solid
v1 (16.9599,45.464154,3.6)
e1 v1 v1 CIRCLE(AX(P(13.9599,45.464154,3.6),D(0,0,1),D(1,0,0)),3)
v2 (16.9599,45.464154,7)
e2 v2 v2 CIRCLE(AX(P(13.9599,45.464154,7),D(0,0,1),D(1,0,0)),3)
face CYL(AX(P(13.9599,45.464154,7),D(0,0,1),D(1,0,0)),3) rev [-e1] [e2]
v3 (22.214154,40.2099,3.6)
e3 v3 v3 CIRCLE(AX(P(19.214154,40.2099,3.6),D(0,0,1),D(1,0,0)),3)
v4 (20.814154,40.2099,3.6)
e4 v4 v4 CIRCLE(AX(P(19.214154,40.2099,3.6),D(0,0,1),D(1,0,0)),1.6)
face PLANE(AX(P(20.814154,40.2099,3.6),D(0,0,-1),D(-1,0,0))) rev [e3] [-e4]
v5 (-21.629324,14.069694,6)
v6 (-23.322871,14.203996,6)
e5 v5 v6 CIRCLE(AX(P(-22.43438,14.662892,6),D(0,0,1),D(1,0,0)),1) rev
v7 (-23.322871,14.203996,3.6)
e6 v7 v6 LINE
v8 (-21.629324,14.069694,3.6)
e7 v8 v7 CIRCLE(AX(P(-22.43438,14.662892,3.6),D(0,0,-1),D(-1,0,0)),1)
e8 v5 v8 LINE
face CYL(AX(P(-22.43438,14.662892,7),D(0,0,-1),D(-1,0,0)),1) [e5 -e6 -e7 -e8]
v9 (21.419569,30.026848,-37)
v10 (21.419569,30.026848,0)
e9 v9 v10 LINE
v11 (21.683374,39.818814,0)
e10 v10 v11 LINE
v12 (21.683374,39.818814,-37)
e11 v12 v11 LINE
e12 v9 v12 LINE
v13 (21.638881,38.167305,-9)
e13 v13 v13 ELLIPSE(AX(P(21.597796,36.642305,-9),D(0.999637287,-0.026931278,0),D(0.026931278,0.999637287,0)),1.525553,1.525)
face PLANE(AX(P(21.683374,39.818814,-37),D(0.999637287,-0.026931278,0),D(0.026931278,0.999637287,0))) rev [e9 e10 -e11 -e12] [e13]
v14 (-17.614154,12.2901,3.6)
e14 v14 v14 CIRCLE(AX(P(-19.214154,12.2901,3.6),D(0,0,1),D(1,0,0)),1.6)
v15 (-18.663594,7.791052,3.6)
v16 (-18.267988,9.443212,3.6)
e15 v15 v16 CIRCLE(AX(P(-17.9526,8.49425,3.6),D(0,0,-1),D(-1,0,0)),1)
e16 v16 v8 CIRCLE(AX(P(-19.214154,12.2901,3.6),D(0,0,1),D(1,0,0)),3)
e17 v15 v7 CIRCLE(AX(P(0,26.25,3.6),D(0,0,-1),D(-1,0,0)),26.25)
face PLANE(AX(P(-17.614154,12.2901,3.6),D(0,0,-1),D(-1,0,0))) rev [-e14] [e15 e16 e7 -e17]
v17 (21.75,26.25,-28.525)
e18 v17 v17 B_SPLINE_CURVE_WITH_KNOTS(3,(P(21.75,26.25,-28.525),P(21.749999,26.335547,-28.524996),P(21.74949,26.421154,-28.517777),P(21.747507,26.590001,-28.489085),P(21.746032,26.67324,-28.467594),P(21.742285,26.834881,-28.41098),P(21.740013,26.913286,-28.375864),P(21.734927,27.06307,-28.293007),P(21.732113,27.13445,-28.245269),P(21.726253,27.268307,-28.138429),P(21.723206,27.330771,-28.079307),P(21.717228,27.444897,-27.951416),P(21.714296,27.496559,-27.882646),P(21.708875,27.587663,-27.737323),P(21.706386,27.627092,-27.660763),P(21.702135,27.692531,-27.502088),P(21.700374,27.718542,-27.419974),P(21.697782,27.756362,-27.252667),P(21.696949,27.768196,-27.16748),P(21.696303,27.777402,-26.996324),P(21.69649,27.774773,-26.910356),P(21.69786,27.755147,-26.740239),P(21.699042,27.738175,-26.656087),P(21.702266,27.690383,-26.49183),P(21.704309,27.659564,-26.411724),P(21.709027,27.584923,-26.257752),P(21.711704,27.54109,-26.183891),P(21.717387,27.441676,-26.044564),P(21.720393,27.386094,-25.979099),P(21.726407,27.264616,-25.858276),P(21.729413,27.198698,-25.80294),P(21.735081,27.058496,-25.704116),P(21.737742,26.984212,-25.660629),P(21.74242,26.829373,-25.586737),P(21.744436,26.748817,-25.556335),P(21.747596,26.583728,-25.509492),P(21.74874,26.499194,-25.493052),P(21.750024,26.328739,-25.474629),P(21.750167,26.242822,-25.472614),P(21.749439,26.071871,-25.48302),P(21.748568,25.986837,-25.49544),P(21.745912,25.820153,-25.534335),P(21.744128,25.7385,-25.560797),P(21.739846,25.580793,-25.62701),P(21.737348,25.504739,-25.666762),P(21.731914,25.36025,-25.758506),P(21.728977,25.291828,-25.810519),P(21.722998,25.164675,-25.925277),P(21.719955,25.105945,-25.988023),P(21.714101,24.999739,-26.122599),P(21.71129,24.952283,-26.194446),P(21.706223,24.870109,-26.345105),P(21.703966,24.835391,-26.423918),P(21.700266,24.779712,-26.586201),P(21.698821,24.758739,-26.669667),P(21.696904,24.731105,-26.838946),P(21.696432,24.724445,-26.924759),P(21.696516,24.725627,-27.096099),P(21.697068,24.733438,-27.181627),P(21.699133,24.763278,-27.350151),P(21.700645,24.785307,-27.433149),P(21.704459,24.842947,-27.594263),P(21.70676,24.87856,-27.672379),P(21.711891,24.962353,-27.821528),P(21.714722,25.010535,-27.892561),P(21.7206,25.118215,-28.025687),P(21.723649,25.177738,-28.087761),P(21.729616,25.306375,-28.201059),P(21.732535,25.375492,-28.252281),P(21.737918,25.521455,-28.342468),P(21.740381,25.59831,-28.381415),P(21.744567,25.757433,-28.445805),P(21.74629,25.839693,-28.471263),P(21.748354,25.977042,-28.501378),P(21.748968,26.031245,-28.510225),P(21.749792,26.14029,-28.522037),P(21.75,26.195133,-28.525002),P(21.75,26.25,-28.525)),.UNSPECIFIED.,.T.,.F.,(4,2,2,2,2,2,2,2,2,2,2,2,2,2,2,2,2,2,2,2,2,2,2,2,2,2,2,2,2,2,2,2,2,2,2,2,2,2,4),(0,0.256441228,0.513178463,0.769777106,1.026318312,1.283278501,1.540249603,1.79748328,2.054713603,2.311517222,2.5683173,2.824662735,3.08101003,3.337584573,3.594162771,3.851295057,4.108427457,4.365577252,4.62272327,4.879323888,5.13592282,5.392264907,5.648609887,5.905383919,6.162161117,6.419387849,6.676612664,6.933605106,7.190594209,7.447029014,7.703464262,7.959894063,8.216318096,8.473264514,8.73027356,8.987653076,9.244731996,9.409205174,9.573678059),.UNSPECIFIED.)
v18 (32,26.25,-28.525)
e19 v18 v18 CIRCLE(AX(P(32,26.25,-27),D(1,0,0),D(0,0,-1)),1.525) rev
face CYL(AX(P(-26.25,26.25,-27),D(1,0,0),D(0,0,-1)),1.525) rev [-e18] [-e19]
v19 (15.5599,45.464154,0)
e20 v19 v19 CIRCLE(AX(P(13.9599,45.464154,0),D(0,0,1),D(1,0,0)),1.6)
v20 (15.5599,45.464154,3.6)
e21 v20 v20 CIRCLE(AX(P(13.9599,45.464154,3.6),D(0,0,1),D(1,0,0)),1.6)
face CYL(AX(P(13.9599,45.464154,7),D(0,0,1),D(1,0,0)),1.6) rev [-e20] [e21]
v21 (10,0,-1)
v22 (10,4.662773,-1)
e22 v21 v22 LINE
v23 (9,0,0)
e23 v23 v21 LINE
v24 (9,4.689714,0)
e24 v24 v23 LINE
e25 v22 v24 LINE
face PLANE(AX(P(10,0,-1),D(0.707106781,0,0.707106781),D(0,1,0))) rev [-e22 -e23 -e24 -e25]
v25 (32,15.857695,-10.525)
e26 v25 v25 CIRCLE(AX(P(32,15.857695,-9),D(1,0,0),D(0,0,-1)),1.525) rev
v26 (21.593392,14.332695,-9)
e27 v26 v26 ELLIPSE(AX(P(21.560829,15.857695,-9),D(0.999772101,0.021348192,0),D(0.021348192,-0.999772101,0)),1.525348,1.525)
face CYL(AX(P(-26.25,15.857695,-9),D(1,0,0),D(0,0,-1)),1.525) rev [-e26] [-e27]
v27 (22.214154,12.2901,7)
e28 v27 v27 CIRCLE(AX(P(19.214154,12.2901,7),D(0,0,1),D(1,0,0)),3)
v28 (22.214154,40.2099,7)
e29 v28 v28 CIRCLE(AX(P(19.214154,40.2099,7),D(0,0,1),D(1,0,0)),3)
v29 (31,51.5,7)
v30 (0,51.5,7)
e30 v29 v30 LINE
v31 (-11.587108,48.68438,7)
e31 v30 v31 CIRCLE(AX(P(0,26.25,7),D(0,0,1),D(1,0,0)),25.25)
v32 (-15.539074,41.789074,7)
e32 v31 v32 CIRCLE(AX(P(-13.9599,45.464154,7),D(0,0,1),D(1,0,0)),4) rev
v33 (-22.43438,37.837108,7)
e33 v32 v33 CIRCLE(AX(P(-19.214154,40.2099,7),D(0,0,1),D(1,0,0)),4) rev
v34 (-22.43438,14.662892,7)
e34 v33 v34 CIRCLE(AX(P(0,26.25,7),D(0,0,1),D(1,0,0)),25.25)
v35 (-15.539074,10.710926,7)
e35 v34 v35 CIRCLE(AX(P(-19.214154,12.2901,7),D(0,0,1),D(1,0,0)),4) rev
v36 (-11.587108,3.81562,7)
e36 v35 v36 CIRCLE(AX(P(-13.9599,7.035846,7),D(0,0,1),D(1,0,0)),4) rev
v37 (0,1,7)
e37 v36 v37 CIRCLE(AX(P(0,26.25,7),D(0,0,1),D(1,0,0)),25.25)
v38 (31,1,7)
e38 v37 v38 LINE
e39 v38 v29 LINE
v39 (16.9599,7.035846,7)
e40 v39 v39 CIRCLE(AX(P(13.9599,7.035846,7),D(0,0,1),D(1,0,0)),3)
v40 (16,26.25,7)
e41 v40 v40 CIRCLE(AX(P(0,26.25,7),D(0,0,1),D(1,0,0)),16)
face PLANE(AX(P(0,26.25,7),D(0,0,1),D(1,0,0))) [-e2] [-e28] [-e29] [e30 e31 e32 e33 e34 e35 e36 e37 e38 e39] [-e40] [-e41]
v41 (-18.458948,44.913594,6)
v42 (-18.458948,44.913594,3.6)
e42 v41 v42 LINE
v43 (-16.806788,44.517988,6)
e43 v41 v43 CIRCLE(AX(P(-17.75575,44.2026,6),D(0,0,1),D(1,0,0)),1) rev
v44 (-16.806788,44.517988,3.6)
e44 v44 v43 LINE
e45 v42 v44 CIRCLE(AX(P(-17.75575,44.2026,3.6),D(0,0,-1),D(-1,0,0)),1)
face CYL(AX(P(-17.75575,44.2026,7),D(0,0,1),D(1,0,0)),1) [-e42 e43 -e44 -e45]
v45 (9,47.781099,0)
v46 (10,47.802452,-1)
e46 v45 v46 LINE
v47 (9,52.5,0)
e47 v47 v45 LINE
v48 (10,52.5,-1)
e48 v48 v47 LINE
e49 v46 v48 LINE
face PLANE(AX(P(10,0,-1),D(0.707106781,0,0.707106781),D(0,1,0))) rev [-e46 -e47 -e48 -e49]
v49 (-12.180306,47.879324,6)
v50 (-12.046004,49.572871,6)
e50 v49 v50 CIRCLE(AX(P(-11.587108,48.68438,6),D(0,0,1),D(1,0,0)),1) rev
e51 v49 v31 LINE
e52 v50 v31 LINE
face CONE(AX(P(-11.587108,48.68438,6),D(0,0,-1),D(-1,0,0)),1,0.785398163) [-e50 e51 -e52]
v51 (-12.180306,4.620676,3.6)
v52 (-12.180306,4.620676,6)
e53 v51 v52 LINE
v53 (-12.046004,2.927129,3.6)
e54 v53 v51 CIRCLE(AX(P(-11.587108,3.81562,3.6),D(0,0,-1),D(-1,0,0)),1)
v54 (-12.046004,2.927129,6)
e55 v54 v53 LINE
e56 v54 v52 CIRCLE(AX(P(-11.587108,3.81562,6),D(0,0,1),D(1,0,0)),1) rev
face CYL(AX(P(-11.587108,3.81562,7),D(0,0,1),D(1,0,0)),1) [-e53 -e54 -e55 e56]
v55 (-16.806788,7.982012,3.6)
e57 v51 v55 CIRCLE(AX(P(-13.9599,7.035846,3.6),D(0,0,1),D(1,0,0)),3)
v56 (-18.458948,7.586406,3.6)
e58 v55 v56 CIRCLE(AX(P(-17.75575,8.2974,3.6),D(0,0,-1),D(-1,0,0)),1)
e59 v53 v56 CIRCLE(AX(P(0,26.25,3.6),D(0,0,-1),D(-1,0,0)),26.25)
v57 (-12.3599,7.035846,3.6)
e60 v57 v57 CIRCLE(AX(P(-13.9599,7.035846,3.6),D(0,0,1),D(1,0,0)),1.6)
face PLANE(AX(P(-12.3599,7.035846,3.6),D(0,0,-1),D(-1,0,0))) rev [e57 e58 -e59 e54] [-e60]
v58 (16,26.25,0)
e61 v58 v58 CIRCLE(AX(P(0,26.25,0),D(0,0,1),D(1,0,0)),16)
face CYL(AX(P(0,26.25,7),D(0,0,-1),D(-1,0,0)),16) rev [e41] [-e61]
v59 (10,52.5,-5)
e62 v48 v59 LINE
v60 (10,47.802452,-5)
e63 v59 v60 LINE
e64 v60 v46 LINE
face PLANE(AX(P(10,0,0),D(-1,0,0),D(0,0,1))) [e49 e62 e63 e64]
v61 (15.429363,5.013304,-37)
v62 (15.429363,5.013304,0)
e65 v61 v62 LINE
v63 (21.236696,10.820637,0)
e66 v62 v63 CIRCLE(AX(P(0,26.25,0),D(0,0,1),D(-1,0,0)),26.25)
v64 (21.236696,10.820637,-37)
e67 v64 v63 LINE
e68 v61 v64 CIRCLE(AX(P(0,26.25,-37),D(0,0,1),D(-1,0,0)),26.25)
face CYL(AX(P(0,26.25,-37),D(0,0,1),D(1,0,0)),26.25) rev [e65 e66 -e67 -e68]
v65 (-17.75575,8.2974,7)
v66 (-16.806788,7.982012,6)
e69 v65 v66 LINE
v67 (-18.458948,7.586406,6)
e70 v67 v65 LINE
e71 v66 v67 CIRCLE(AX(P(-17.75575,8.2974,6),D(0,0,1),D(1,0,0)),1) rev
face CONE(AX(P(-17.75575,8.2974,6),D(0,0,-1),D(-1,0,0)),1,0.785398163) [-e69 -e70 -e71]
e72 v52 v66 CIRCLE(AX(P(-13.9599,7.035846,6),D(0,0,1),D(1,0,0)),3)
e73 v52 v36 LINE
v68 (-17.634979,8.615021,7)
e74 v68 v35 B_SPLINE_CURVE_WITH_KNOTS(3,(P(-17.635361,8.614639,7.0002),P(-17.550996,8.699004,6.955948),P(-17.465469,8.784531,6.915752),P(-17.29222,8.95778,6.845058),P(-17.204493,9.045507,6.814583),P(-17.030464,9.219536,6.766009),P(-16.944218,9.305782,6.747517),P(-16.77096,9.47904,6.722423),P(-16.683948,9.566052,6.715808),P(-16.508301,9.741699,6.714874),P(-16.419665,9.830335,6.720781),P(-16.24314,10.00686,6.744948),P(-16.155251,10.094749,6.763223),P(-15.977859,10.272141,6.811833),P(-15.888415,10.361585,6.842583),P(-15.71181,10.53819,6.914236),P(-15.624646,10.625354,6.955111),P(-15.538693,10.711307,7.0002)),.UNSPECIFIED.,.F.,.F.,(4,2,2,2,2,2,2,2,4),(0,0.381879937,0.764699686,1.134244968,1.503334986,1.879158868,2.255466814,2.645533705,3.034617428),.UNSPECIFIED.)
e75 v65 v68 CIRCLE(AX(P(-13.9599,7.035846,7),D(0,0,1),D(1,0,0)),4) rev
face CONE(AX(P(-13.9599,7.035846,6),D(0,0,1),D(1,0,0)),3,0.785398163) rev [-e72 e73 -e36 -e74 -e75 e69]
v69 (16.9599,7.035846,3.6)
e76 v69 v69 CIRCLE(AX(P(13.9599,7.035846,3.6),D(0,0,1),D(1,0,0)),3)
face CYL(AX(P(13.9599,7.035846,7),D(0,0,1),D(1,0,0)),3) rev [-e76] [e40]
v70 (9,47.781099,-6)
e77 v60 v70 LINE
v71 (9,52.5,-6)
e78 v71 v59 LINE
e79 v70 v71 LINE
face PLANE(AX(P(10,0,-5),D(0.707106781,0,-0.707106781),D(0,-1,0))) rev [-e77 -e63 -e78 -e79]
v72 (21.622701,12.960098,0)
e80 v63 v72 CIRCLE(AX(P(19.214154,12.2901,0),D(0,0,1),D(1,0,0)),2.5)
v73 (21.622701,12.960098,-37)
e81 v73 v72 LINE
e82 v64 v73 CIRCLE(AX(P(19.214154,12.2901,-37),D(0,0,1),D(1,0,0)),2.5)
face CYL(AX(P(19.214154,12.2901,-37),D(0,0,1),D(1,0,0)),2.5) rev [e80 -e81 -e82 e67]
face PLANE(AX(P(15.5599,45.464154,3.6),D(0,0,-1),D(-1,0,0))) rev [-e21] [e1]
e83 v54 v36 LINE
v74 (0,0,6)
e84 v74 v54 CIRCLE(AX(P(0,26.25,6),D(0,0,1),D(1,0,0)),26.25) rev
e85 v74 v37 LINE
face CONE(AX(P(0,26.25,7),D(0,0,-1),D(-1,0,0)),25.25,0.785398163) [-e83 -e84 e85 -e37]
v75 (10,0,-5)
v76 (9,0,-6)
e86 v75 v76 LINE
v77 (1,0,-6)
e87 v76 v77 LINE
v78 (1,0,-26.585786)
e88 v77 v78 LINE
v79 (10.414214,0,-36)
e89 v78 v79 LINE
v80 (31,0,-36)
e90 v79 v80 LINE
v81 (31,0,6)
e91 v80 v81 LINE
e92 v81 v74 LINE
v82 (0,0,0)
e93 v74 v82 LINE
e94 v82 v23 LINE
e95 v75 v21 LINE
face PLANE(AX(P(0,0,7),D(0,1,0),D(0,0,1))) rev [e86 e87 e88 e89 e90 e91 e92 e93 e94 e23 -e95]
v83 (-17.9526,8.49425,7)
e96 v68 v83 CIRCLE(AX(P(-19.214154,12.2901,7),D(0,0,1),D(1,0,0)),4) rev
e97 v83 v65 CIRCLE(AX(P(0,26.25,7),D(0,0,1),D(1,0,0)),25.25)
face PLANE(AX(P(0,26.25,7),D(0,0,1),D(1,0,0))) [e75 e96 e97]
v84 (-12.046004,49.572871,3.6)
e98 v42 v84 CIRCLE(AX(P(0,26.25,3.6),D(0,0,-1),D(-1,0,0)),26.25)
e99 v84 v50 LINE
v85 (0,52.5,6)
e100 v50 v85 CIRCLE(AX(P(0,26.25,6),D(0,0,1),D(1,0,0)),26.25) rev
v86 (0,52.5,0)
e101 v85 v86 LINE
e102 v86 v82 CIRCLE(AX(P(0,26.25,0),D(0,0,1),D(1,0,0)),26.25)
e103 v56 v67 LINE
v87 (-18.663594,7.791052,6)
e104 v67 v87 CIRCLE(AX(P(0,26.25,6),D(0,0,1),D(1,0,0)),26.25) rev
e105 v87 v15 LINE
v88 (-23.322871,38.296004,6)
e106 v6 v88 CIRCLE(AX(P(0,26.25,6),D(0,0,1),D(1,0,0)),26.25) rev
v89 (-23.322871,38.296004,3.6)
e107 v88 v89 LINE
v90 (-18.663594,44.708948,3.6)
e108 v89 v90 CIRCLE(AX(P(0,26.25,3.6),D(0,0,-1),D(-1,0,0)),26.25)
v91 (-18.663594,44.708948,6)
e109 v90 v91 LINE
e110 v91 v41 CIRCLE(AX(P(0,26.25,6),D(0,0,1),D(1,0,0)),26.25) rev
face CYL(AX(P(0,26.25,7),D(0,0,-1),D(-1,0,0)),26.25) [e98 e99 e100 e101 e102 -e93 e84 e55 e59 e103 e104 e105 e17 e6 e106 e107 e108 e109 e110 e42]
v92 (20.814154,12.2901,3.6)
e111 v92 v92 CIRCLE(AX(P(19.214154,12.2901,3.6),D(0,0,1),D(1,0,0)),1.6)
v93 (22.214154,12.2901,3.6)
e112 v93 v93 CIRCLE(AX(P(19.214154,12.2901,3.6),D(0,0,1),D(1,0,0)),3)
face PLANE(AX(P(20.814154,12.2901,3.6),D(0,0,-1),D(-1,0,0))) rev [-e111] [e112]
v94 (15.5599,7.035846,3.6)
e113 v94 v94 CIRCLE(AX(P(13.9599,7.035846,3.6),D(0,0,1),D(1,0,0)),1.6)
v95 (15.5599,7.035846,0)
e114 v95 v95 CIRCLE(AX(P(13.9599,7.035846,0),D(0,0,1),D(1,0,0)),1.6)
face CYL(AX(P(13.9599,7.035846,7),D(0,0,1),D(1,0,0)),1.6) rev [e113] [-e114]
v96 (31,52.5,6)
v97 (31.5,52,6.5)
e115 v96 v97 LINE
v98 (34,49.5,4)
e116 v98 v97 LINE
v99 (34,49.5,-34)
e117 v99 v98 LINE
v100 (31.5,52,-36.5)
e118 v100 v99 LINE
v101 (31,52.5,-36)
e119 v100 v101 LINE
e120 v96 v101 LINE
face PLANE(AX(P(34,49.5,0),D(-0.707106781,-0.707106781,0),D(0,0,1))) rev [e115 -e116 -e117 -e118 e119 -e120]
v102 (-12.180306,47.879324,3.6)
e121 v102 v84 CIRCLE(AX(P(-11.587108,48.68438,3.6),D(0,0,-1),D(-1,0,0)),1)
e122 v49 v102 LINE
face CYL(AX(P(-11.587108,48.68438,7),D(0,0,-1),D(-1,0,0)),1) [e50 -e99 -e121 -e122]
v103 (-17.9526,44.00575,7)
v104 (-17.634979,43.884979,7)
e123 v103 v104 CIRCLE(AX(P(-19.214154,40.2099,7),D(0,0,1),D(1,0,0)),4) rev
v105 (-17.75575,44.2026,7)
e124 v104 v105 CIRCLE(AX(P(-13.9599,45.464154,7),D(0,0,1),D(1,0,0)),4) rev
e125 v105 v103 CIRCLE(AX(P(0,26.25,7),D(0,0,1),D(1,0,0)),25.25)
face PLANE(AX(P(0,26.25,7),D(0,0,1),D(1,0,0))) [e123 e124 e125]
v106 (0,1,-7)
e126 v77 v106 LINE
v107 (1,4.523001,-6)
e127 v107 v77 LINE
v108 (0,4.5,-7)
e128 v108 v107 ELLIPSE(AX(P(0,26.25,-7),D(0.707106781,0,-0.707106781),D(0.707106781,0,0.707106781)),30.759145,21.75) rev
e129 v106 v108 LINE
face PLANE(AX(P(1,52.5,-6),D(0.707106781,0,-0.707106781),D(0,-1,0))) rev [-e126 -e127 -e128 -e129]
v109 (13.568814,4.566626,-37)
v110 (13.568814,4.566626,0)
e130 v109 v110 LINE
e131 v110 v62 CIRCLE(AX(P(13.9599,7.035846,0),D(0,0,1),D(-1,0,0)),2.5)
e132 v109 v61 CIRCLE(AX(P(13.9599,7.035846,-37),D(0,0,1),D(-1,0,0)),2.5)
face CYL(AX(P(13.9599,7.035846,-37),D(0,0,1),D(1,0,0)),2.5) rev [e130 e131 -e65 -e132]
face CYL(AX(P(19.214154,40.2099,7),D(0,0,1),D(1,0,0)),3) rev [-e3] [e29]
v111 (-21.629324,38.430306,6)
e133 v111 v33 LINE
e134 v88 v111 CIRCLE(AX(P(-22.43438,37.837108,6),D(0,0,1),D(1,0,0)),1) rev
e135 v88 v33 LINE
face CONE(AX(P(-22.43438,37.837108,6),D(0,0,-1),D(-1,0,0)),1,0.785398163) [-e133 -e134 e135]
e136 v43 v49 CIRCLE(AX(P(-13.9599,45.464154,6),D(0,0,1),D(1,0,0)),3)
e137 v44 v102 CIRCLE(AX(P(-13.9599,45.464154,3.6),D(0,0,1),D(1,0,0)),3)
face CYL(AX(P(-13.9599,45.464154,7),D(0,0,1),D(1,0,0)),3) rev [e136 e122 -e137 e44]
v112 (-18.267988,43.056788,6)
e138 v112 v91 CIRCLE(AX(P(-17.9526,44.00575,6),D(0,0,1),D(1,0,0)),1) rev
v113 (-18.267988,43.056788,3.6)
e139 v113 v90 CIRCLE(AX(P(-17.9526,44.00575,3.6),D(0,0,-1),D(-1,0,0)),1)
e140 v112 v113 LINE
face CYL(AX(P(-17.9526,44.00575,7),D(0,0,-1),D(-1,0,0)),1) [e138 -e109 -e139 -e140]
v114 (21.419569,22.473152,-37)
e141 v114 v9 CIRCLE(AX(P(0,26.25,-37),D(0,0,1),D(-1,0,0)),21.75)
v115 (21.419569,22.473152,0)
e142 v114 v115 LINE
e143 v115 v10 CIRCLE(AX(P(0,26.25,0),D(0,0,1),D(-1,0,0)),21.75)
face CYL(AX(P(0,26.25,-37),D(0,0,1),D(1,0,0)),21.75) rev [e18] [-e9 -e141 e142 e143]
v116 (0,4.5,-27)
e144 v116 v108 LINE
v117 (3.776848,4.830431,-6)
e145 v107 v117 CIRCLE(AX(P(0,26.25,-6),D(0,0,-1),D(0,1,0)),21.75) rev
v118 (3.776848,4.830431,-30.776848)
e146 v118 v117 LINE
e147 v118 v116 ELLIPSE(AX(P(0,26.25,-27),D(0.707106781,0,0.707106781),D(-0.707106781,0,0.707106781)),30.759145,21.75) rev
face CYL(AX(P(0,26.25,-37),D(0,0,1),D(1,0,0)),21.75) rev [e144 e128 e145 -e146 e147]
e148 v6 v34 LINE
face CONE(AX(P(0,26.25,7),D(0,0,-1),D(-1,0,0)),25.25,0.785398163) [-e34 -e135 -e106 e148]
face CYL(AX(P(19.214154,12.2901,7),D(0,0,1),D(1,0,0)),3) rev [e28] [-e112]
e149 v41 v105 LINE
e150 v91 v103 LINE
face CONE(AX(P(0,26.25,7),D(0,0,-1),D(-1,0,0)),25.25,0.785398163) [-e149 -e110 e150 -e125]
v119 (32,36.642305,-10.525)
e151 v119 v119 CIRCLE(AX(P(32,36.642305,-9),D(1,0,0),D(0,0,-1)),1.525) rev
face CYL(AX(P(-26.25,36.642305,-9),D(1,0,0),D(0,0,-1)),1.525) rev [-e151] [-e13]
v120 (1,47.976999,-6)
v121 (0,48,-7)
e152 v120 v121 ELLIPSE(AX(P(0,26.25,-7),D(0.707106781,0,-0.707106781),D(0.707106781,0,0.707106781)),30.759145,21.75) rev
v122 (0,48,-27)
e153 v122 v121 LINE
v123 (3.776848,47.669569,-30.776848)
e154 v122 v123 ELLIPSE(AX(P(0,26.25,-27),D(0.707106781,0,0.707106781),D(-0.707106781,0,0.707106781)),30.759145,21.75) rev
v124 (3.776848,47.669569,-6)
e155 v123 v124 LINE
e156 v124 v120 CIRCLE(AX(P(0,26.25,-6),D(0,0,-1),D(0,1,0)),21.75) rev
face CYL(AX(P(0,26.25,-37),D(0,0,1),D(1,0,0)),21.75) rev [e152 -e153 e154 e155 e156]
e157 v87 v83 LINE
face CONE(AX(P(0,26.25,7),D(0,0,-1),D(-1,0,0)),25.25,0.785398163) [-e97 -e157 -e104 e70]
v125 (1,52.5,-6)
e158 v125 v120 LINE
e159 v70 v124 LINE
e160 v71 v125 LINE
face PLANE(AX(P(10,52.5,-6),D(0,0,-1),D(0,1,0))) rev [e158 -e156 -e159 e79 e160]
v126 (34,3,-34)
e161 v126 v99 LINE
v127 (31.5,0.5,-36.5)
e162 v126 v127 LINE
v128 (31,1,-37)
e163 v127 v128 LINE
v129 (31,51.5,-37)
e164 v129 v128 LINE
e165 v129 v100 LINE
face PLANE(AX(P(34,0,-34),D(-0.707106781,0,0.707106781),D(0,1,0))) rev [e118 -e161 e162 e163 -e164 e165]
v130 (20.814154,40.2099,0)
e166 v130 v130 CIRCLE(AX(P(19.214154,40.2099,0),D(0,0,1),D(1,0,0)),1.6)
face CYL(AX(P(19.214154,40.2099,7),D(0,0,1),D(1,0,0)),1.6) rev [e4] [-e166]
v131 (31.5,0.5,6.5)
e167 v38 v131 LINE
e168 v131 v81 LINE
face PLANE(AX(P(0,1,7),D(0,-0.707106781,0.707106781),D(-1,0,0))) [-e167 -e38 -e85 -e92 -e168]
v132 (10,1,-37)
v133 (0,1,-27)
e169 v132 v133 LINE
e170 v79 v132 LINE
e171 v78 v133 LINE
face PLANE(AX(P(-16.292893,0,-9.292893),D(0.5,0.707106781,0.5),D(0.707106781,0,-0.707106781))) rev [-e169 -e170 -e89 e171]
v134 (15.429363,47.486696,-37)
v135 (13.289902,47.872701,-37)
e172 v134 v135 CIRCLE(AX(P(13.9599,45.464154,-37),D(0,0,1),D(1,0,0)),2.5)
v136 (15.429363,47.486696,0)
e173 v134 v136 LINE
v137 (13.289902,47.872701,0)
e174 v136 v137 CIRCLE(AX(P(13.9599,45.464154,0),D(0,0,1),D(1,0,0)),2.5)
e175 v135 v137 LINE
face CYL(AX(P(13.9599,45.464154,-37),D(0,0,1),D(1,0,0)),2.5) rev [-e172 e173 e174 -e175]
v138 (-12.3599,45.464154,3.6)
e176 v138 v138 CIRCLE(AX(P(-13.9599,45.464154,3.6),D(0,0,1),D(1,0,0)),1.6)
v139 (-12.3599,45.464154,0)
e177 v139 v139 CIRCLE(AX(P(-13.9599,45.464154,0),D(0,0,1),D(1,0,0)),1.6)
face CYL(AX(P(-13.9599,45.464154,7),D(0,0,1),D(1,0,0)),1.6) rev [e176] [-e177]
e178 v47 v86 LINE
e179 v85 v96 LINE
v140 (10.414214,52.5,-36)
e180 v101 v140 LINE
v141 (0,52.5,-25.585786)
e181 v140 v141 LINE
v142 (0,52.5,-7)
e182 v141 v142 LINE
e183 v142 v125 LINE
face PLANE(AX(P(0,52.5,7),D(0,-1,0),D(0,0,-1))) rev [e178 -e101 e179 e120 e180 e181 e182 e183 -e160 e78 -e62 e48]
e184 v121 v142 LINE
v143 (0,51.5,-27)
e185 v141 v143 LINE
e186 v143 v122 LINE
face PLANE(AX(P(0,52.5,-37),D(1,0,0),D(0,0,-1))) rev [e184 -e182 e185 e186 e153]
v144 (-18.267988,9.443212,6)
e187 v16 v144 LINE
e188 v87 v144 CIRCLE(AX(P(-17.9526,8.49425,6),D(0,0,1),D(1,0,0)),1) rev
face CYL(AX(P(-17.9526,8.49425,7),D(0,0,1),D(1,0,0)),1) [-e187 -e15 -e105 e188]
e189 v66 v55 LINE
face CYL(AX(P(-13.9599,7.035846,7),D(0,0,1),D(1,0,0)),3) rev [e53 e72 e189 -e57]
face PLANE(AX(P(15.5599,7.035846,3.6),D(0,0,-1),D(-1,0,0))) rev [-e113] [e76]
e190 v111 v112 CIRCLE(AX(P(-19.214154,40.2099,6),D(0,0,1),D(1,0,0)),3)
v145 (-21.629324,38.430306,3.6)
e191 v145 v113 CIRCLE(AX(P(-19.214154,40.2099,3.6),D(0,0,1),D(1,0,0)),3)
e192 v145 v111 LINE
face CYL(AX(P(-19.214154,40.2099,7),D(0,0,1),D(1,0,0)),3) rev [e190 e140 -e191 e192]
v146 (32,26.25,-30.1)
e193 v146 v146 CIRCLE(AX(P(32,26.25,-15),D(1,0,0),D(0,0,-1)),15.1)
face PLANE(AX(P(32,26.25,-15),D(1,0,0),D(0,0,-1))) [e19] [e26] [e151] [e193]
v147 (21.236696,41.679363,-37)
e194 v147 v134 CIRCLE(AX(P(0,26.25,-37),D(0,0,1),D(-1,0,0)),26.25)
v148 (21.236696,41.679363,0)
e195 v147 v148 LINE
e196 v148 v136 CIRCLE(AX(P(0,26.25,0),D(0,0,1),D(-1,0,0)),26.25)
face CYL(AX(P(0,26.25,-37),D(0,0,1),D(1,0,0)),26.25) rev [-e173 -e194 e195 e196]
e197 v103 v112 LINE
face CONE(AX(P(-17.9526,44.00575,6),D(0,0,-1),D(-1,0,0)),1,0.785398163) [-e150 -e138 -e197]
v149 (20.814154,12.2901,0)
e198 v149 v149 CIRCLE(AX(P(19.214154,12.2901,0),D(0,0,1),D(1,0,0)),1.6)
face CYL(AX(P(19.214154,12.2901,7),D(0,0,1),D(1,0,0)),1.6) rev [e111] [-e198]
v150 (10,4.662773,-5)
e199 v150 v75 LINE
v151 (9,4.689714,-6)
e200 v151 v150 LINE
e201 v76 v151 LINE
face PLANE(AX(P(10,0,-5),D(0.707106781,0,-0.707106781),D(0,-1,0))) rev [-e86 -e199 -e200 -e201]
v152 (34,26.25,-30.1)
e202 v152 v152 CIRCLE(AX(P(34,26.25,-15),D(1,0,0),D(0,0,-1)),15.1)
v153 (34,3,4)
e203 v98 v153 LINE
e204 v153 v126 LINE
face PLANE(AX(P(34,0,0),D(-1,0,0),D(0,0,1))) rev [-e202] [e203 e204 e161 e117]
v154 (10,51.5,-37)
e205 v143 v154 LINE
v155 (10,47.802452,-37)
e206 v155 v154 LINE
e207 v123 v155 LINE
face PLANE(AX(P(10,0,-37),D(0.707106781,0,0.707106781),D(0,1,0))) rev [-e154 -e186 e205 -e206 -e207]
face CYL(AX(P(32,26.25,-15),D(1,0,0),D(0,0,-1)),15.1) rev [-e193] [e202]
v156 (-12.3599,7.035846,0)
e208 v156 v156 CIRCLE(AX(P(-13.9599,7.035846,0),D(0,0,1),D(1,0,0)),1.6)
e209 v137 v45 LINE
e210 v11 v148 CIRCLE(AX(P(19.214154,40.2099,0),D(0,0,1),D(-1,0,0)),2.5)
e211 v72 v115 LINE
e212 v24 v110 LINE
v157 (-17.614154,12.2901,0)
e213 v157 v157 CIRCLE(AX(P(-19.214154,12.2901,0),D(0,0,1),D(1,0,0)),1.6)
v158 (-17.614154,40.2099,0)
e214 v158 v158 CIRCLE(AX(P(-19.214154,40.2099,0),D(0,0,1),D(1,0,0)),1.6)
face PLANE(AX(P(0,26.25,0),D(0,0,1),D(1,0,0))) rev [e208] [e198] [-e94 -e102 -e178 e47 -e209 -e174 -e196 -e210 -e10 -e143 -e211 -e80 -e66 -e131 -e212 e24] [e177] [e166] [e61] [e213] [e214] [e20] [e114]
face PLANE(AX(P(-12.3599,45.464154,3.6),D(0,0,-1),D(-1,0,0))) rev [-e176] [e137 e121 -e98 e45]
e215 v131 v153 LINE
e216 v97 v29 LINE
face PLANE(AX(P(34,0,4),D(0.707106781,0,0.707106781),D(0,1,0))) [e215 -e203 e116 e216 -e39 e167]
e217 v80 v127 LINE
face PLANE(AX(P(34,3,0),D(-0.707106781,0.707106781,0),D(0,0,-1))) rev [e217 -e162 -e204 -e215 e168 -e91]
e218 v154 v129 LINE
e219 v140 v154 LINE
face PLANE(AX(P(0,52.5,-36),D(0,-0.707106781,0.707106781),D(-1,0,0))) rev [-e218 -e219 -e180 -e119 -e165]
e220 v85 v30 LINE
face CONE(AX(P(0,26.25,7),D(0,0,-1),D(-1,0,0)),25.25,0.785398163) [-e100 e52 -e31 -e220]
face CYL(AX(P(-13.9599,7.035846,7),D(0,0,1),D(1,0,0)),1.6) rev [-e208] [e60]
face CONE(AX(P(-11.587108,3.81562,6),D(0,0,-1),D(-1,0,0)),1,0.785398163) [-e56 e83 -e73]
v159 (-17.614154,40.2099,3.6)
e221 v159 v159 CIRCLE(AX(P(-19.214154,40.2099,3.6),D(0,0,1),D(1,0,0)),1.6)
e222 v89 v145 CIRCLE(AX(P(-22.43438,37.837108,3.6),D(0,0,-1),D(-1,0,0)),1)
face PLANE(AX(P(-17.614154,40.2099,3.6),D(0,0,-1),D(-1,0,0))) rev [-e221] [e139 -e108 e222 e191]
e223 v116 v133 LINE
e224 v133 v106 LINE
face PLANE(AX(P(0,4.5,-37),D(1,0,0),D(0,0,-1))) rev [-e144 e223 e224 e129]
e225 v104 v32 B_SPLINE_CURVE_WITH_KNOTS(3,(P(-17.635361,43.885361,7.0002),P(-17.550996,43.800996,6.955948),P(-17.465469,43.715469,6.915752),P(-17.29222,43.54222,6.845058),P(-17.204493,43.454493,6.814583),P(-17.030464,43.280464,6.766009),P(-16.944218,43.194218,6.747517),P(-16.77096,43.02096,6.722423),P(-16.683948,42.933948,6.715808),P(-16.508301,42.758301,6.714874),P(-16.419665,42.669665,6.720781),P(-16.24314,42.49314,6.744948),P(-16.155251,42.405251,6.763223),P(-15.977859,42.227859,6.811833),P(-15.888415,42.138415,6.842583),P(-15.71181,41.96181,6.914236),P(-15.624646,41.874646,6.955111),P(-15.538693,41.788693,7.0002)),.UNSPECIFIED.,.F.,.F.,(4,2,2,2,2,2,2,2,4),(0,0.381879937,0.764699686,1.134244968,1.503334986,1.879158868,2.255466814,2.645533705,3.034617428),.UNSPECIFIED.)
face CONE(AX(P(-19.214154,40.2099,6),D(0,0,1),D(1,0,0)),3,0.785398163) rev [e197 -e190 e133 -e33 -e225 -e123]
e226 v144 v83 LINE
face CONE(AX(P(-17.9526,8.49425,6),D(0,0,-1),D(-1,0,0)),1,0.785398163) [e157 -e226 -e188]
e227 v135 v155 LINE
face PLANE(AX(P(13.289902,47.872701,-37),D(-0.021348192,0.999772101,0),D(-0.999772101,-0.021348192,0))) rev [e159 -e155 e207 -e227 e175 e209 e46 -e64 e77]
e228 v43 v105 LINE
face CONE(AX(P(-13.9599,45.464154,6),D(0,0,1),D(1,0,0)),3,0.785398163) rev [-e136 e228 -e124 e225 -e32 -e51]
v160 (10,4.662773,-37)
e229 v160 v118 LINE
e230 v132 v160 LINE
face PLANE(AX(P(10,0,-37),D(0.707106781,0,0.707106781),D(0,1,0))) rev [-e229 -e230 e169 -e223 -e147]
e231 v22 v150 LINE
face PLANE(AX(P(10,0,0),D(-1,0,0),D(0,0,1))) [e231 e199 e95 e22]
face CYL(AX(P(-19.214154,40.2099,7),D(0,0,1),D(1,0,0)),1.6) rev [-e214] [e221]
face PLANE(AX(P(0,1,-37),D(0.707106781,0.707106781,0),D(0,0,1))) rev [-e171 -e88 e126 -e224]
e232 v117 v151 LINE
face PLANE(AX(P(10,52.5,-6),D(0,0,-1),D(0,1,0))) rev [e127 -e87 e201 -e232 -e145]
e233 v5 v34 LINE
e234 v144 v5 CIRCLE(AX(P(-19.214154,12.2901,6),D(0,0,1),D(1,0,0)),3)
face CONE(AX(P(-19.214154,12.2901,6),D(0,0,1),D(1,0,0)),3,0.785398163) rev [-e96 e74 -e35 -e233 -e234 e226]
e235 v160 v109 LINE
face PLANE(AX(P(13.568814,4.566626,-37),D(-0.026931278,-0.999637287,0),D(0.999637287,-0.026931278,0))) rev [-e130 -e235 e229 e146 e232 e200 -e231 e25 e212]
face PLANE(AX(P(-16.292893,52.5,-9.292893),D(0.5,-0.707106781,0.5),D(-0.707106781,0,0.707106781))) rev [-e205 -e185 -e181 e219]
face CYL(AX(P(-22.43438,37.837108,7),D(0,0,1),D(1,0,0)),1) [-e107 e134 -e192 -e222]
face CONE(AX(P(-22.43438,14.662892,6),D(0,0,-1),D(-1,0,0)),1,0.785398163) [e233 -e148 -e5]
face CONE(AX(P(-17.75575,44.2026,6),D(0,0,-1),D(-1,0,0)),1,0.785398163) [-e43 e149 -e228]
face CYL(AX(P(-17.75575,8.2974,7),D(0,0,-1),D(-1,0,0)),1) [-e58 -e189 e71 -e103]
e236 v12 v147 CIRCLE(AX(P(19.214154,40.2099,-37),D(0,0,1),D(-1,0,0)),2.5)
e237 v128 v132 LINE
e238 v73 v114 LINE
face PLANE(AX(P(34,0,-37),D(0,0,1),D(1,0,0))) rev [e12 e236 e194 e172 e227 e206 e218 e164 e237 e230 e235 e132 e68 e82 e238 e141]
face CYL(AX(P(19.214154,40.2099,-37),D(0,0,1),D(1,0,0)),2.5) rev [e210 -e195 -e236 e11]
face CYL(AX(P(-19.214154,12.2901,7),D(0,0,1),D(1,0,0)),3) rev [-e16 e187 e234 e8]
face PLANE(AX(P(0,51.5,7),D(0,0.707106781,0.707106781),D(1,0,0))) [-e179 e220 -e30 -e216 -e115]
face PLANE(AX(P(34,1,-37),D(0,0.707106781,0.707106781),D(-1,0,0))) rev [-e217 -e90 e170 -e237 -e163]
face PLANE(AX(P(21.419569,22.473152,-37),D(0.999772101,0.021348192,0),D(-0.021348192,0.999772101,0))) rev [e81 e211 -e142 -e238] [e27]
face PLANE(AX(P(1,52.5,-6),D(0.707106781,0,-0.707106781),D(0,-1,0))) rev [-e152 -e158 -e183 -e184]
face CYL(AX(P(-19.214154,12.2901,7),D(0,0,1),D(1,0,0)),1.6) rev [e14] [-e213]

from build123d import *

# Parameters (mm, degrees)
SKETCH_1_R                   = 16
EXTRUDE_1_DEPTH              = 7
SKETCH_2_W                   = 44
SKETCH_2_H                   = 52.5
EXTRUDE_2_DEPTH              = 4
CHAMFER_1_SIZE               = 3
EXTRUDE_START                = 37
EXTRUDE_5_DEPTH              = 37
CHAMFER_7_SIZE               = 10
CHAMFER_8_SIZE               = 3
CHAMFER_9_SIZE               = 1
HOLE_WIZARD_M3_1_D           = 3.2
HOLE_WIZARD_M3_1_CBORE_D     = 6
HOLE_WIZARD_M3_1_CBORE_DEPTH = 3.4
FILLET_11_R                  = 1
SKETCH_24_W                  = 6
SKETCH_24_H                  = 52.5
CUT_EXTRUDE_3_DEPTH          = 10
CHAMFER_12_SIZE              = 1
SKETCH_6_R                   = 1.525
CUT_EXTRUDE_4_DEPTH          = 89.06425224
SKETCH_25_R                  = 15.1
CUT_EXTRUDE_5_DEPTH          = 2


with BuildPart() as part:
    # 草图1 → 凸台-拉伸1 (new body)
    with BuildSketch(Plane.XY):
        with BuildLine():
            Line((0, 0), (30, 0))
            Line((30, 0), (30, 52.5))
            Line((30, 52.5), (0, 52.5))
            ThreePointArc((0, 52.5), (-26.25, 26.25), (0, 0))
        make_face()
        with Locations((0, 26.25)):
            Circle(SKETCH_1_R, mode=Mode.SUBTRACT)
    extrude(amount=EXTRUDE_1_DEPTH)

    # 草图2 → 凸台-拉伸2 (add)
    with BuildSketch(Plane(origin=(30, 0, 0), x_dir=(0, 0, -1), z_dir=(1, 0, 0))):
        with Locations((15, 26.25)):
            Rectangle(SKETCH_2_W, SKETCH_2_H)
    extrude(amount=EXTRUDE_2_DEPTH)

    # 倒角1
    chamfer_1_edges = [part.edges().sort_by_distance(p)[0] for p in [
        (34, 26.25, 7),
        (34, 26.25, -37),
    ]]
    chamfer(chamfer_1_edges, length=CHAMFER_1_SIZE)

    # 草图16 → 凸台-拉伸5 (add)
    with BuildSketch(Plane(origin=(0, 0, 0), x_dir=(-1, 0, 0), z_dir=(0, 0, -1)).offset(EXTRUDE_START)):
        with BuildLine():
            Line((-30, 52.5), (0, 52.5))
            Line((0, 52.5), (0, 48))
            ThreePointArc((0, 48), (-1.895637405, 47.917234683), (-3.776847864, 47.669568628))
            Line((-3.776847864, 47.669568628), (-13.289901618, 47.872701418))
            ThreePointArc((-13.289901618, 47.872701418), (-14.403787228, 47.924430816), (-15.429362873, 47.486696102))
            ThreePointArc((-15.429362873, 47.486696102), (-18.561553006, 44.811553006), (-21.236696102, 41.679362873))
            ThreePointArc((-21.236696102, 41.679362873), (-21.645078417, 40.793513152), (-21.683374468, 39.818813579))
            Line((-21.683374468, 39.818813579), (-21.419568628, 30.026847864))
            ThreePointArc((-21.419568628, 30.026847864), (-21.75, 26.25), (-21.419568628, 22.473152136))
            Line((-21.419568628, 22.473152136), (-21.622701418, 12.960098382))
            ThreePointArc((-21.622701418, 12.960098382), (-21.674430816, 11.846212772), (-21.236696102, 10.820637127))
            ThreePointArc((-21.236696102, 10.820637127), (-18.561553006, 7.688446994), (-15.429362873, 5.013303898))
            ThreePointArc((-15.429362873, 5.013303898), (-14.543513152, 4.604921583), (-13.568813579, 4.566625532))
            Line((-13.568813579, 4.566625532), (-3.776847864, 4.830431372))
            ThreePointArc((-3.776847864, 4.830431372), (-1.895637405, 4.582765317), (0, 4.5))
            Line((0, 4.5), (0, 0))
            Line((0, 0), (-30, 0))
            Line((-30, 0), (-30, 52.5))
        make_face()
    extrude(amount=-EXTRUDE_5_DEPTH)

    # 倒角7
    chamfer_7_edges = [part.edges().sort_by_distance(p)[0] for p in [
        (0, 2.25, -37),
        (0, 50.25, -37),
    ]]
    chamfer(chamfer_7_edges, length=CHAMFER_7_SIZE)

    # 倒角8
    chamfer_8_edges = [part.edges().sort_by_distance(p)[0] for p in [
        (34, 0, -15),
        (34, 52.5, -15),
    ]]
    chamfer(chamfer_8_edges, length=CHAMFER_8_SIZE)

    # 倒角9
    chamfer_9_edges = [part.edges().sort_by_distance(p)[0] for p in [
        (0, 0, -13.5),
        (5, 0, -32),
        (5, 52.5, -32),
        (20.5, 52.5, -37),
        (20.5, 0, -37),
    ]]
    chamfer(chamfer_9_edges, length=CHAMFER_9_SIZE)

    # M3 六角圆柱头螺钉的柱形沉头孔1 (through all)
    with Locations(Plane.XY.offset(7)):
        with Locations((19.214153616, 12.290100258), (-19.214153616, 12.290100258), (-13.959899742, 7.035846384), (-13.959899742, 45.464153616), (-19.214153616, 40.209899742), (19.214153616, 40.209899742), (13.959899742, 45.464153616), (13.959899742, 7.035846384)):
            CounterBoreHole(HOLE_WIZARD_M3_1_D / 2, HOLE_WIZARD_M3_1_CBORE_D / 2, HOLE_WIZARD_M3_1_CBORE_DEPTH)

    # 圆角11
    fillet_11_edges = [part.edges().sort_by_distance(p)[0] for p in [
        (-22.214042982, 40.235663888, 5.3),
        (-20.16567357, 43.055002513, 5.3),
        (-16.805002513, 46.41567357, 5.3),
        (-13.985663888, 48.464042982, 5.3),
        (-13.985663888, 4.035957018, 5.3),
        (-16.805002513, 6.08432643, 5.3),
        (-20.16567357, 9.444997487, 5.3),
        (-22.214042982, 12.264336112, 5.3),
    ]]
    fillet(fillet_11_edges, radius=FILLET_11_R)

    # 倒角11
    # the kernel refuses this chamfer: 1 mm, written as the material it takes off along each edge
    with BuildSketch(Plane(origin=(0, 26.25, 7), x_dir=(0, 1, 0), z_dir=(1, 0, 0))) as chamfer_11_piece_1:
        with BuildLine():
            Line((25.221715729, 0.028284271), (26.278284271, -1.028284271))
            Line((26.278284271, -1.028284271), (26.298284271, -1.028284271))
            ThreePointArc((26.298284271, -1.028284271), (26.27, -0.514142136), (26.27, 0))
            Line((26.27, 0), (26.25, 0.02))
            ThreePointArc((26.25, 0.02), (25.735857864, 0.02), (25.221715729, 0.048284271))
            Line((25.221715729, 0.048284271), (25.221715729, 0.028284271))
        make_face()
    revolve(axis=Axis((0, 26.25, 7), (0, 0, 1)), revolution_arc=27.315851026, mode=Mode.SUBTRACT)
    with BuildSketch(Plane(origin=(33.571682988, 0, 7), x_dir=(0, 1, 0), z_dir=(-1, 0, 0))) as chamfer_11_piece_2:
        with BuildLine():
            Line((1.028284271, -0.028284271), (-0.028284271, 1.028284271))
            Line((-0.028284271, 1.028284271), (-0.048284271, 1.028284271))
            ThreePointArc((-0.048284271, 1.028284271), (-0.02, 0.514142136), (-0.02, 0))
            Line((-0.02, 0), (0, -0.02))
            ThreePointArc((0, -0.02), (0.514142136, -0.02), (1.028284271, -0.048284271))
            Line((1.028284271, -0.048284271), (1.028284271, -0.028284271))
        make_face()
    extrude(amount=33.571682988, mode=Mode.SUBTRACT)
    with BuildSketch(Plane(origin=(0, 26.25, 7), x_dir=(-0.8884903120653775, 0.45889537518476686, 0), z_dir=(0.45889537518476686, 0.8884903120653775, 0))) as chamfer_11_piece_3:
        with BuildLine():
            Line((25.221715729, 0.028284271), (26.278284271, -1.028284271))
            Line((26.278284271, -1.028284271), (26.298284271, -1.028284271))
            ThreePointArc((26.298284271, -1.028284271), (26.27, -0.514142136), (26.27, 0))
            Line((26.27, 0), (26.25, 0.02))
            ThreePointArc((26.25, 0.02), (25.735857864, 0.02), (25.221715729, 0.048284271))
            Line((25.221715729, 0.048284271), (25.221715729, 0.028284271))
        make_face()
    revolve(axis=Axis((0, 26.25, 7), (0, 0, 1)), revolution_arc=54.631702051, mode=Mode.SUBTRACT)
    with BuildSketch(Plane(origin=(0, 26.25, 7), x_dir=(-0.7031980313995887, 0.7109940426162115, 0), z_dir=(0.7109940426162115, 0.7031980313995887, 0))) as chamfer_11_piece_4:
        with BuildLine():
            Line((25.221715729, 0.028284271), (26.278284271, -1.028284271))
            Line((26.278284271, -1.028284271), (26.298284271, -1.028284271))
            ThreePointArc((26.298284271, -1.028284271), (26.27, -0.514142136), (26.27, 0))
            Line((26.27, 0), (26.25, 0.02))
            ThreePointArc((26.25, 0.02), (25.735857864, 0.02), (25.221715729, 0.048284271))
            Line((25.221715729, 0.048284271), (25.221715729, 0.028284271))
        make_face()
    revolve(axis=Axis((0, 26.25, 7), (0, 0, 1)), revolution_arc=0.631702048, mode=Mode.SUBTRACT)
    with BuildSketch(Plane(origin=(0, 26.25, 7), x_dir=(-0.4588953751847669, -0.8884903120653774, 0), z_dir=(-0.8884903120653774, 0.4588953751847669, 0))) as chamfer_11_piece_5:
        with BuildLine():
            Line((25.221715729, 0.028284271), (26.278284271, -1.028284271))
            Line((26.278284271, -1.028284271), (26.298284271, -1.028284271))
            ThreePointArc((26.298284271, -1.028284271), (26.27, -0.514142136), (26.27, 0))
            Line((26.27, 0), (26.25, 0.02))
            ThreePointArc((26.25, 0.02), (25.735857864, 0.02), (25.221715729, 0.048284271))
            Line((25.221715729, 0.048284271), (25.221715729, 0.028284271))
        make_face()
    revolve(axis=Axis((0, 26.25, 7), (0, 0, 1)), revolution_arc=27.315851026, mode=Mode.SUBTRACT)
    with BuildSketch(Plane(origin=(0, 26.25, 7), x_dir=(-0.7109940426162115, -0.7031980313995887, 0), z_dir=(-0.7031980313995887, 0.7109940426162115, 0))) as chamfer_11_piece_6:
        with BuildLine():
            Line((25.221715729, 0.028284271), (26.278284271, -1.028284271))
            Line((26.278284271, -1.028284271), (26.298284271, -1.028284271))
            ThreePointArc((26.298284271, -1.028284271), (26.27, -0.514142136), (26.27, 0))
            Line((26.27, 0), (26.25, 0.02))
            ThreePointArc((26.25, 0.02), (25.735857864, 0.02), (25.221715729, 0.048284271))
            Line((25.221715729, 0.048284271), (25.221715729, 0.028284271))
        make_face()
    revolve(axis=Axis((0, 26.25, 7), (0, 0, 1)), revolution_arc=0.631702048, mode=Mode.SUBTRACT)
    with BuildSketch(Plane(origin=(-13.959899742, 7.035846384, 7), x_dir=(-0.9489626377099037, 0.3153885099851645, 0), z_dir=(-0.3153885099851645, -0.9489626377099037, 0))) as chamfer_11_piece_7:
        with BuildLine():
            Line((4.028284271, -0.028284271), (2.971715729, 1.028284271))
            Line((2.971715729, 1.028284271), (2.951715729, 1.028284271))
            ThreePointArc((2.951715729, 1.028284271), (2.98, 0.514142136), (2.98, 0))
            Line((2.98, 0), (3, -0.02))
            ThreePointArc((3, -0.02), (3.514142136, -0.02), (4.028284271, -0.048284271))
            Line((4.028284271, -0.048284271), (4.028284271, -0.028284271))
        make_face()
    revolve(axis=Axis((-13.959899742, 7.035846384, 7), (0, 0, -1)), revolution_arc=215.231461254, mode=Mode.SUBTRACT)
    with BuildSketch(Plane(origin=(-19.214153616, 12.290100258, 7), x_dir=(-0.8050566909126954, 0.5931978796461606, 0), z_dir=(-0.5931978796461606, -0.8050566909126954, 0))) as chamfer_11_piece_8:
        with BuildLine():
            Line((4.028284271, -0.028284271), (2.971715729, 1.028284271))
            Line((2.971715729, 1.028284271), (2.951715729, 1.028284271))
            ThreePointArc((2.951715729, 1.028284271), (2.98, 0.514142136), (2.98, 0))
            Line((2.98, 0), (3, -0.02))
            ThreePointArc((3, -0.02), (3.514142136, -0.02), (4.028284271, -0.048284271))
            Line((4.028284271, -0.048284271), (4.028284271, -0.028284271))
        make_face()
    revolve(axis=Axis((-19.214153616, 12.290100258, 7), (0, 0, -1)), revolution_arc=215.231461254, mode=Mode.SUBTRACT)
    with BuildSketch(Plane(origin=(-13.959899742, 45.464153616, 7), x_dir=(0.5931978796461579, 0.8050566909126975, 0), z_dir=(-0.8050566909126975, 0.5931978796461579, 0))) as chamfer_11_piece_9:
        with BuildLine():
            Line((4.028284271, -0.028284271), (2.971715729, 1.028284271))
            Line((2.971715729, 1.028284271), (2.951715729, 1.028284271))
            ThreePointArc((2.951715729, 1.028284271), (2.98, 0.514142136), (2.98, 0))
            Line((2.98, 0), (3, -0.02))
            ThreePointArc((3, -0.02), (3.514142136, -0.02), (4.028284271, -0.048284271))
            Line((4.028284271, -0.048284271), (4.028284271, -0.028284271))
        make_face()
    revolve(axis=Axis((-13.959899742, 45.464153616, 7), (0, 0, -1)), revolution_arc=215.231461254, mode=Mode.SUBTRACT)
    with BuildSketch(Plane(origin=(-19.214153616, 40.209899742, 7), x_dir=(0.3153885099851653, 0.9489626377099033, 0), z_dir=(-0.9489626377099033, 0.3153885099851653, 0))) as chamfer_11_piece_10:
        with BuildLine():
            Line((4.028284271, -0.028284271), (2.971715729, 1.028284271))
            Line((2.971715729, 1.028284271), (2.951715729, 1.028284271))
            ThreePointArc((2.951715729, 1.028284271), (2.98, 0.514142136), (2.98, 0))
            Line((2.98, 0), (3, -0.02))
            ThreePointArc((3, -0.02), (3.514142136, -0.02), (4.028284271, -0.048284271))
            Line((4.028284271, -0.048284271), (4.028284271, -0.028284271))
        make_face()
    revolve(axis=Axis((-19.214153616, 40.209899742, 7), (0, 0, -1)), revolution_arc=215.231461254, mode=Mode.SUBTRACT)
    with BuildSketch(Plane(origin=(-11.587108278, 48.684380365, 7), x_dir=(-0.5931978511211996, -0.8050567119310237, 0), z_dir=(0.8050567119310237, -0.5931978511211996, 0))) as chamfer_11_piece_11:
        with BuildLine():
            Line((0, 4.5e-08), (1.028284217, 1.028284271))
            Line((1.028284217, 1.028284271), (1.048284217, 1.028284271))
            ThreePointArc((1.048284217, 1.028284271), (1.019999946, 0.514142136), (1.019999955, 0))
            Line((1.019999955, 0), (0.999999955, -0.02))
            Line((0.999999955, -0.02), (0, -0.047506275))
            Line((0, -0.047506275), (0, 4.5e-08))
        make_face()
    revolve(axis=Axis((-11.587108278, 48.684380365, 7), (0, 0, -1)), revolution_arc=116.299884825, mode=Mode.SUBTRACT)
    with BuildSketch(Plane(origin=(-17.755750262, 44.202599624, 7), x_dir=(0.9489626488848115, 0.31538847636133094, 0), z_dir=(0.31538847636133094, -0.9489626488848115, 0))) as chamfer_11_piece_12:
        with BuildLine():
            Line((0, -4.5e-08), (1.028284217, -1.028284271))
            Line((1.028284217, -1.028284271), (1.048284217, -1.028284271))
            ThreePointArc((1.048284217, -1.028284271), (1.019999946, -0.514142136), (1.019999955, 0))
            Line((1.019999955, 0), (0.999999955, 0.02))
            Line((0.999999955, 0.02), (0, 0.047506275))
            Line((0, 0.047506275), (0, -4.5e-08))
        make_face()
    revolve(axis=Axis((-17.755750262, 44.202599624, 7), (0, 0, 1)), revolution_arc=116.299884825, mode=Mode.SUBTRACT)
    with BuildSketch(Plane(origin=(-17.952599624, 44.005750262, 7), x_dir=(-0.31538847636128087, -0.9489626488848283, 0), z_dir=(0.9489626488848283, -0.31538847636128087, 0))) as chamfer_11_piece_13:
        with BuildLine():
            Line((0, 4.5e-08), (1.028284217, 1.028284271))
            Line((1.028284217, 1.028284271), (1.048284217, 1.028284271))
            ThreePointArc((1.048284217, 1.028284271), (1.019999946, 0.514142136), (1.019999955, 0))
            Line((1.019999955, 0), (0.999999955, -0.02))
            Line((0.999999955, -0.02), (0, -0.047506275))
            Line((0, -0.047506275), (0, 4.5e-08))
        make_face()
    revolve(axis=Axis((-17.952599624, 44.005750262, 7), (0, 0, -1)), revolution_arc=116.299884825, mode=Mode.SUBTRACT)
    with BuildSketch(Plane(origin=(-22.434380365, 37.837108278, 7), x_dir=(0.805056711931028, 0.5931978511211936, 0), z_dir=(0.5931978511211936, -0.805056711931028, 0))) as chamfer_11_piece_14:
        with BuildLine():
            Line((0, -4.5e-08), (1.028284217, -1.028284271))
            Line((1.028284217, -1.028284271), (1.048284217, -1.028284271))
            ThreePointArc((1.048284217, -1.028284271), (1.019999946, -0.514142136), (1.019999955, 0))
            Line((1.019999955, 0), (0.999999955, 0.02))
            Line((0.999999955, 0.02), (0, 0.047506275))
            Line((0, 0.047506275), (0, -4.5e-08))
        make_face()
    revolve(axis=Axis((-22.434380365, 37.837108278, 7), (0, 0, 1)), revolution_arc=116.299884825, mode=Mode.SUBTRACT)
    with BuildSketch(Plane(origin=(-22.434380365, 14.662891722, 7), x_dir=(0.8050567119310229, -0.5931978511212006, 0), z_dir=(0.5931978511212006, 0.8050567119310229, 0))) as chamfer_11_piece_15:
        with BuildLine():
            Line((0, 4.5e-08), (1.028284217, 1.028284271))
            Line((1.028284217, 1.028284271), (1.048284217, 1.028284271))
            ThreePointArc((1.048284217, 1.028284271), (1.019999946, 0.514142136), (1.019999955, 0))
            Line((1.019999955, 0), (0.999999955, -0.02))
            Line((0.999999955, -0.02), (0, -0.047506275))
            Line((0, -0.047506275), (0, 4.5e-08))
        make_face()
    revolve(axis=Axis((-22.434380365, 14.662891722, 7), (0, 0, -1)), revolution_arc=116.299884825, mode=Mode.SUBTRACT)
    with BuildSketch(Plane(origin=(-17.952599624, 8.494249738, 7), x_dir=(-0.31538847636130274, 0.948962648884821, 0), z_dir=(0.948962648884821, 0.31538847636130274, 0))) as chamfer_11_piece_16:
        with BuildLine():
            Line((0, -4.5e-08), (1.028284217, -1.028284271))
            Line((1.028284217, -1.028284271), (1.048284217, -1.028284271))
            ThreePointArc((1.048284217, -1.028284271), (1.019999946, -0.514142136), (1.019999955, 0))
            Line((1.019999955, 0), (0.999999955, 0.02))
            Line((0.999999955, 0.02), (0, 0.047506275))
            Line((0, 0.047506275), (0, -4.5e-08))
        make_face()
    revolve(axis=Axis((-17.952599624, 8.494249738, 7), (0, 0, 1)), revolution_arc=116.299884825, mode=Mode.SUBTRACT)
    with BuildSketch(Plane(origin=(-17.755750318, 8.297400445, 7), x_dir=(0.9489626337973922, -0.31538852175739795, 0), z_dir=(0.31538852175739795, 0.9489626337973922, 0))) as chamfer_11_piece_17:
        with BuildLine():
            Line((0, -3e-08), (1.028284298, 1.028284271))
            Line((1.028284298, 1.028284271), (1.048284298, 1.028284271))
            ThreePointArc((1.048284298, 1.028284271), (1.020000027, 0.514142136), (1.02000003, 0))
            Line((1.02000003, 0), (1.00000003, -0.02))
            Line((1.00000003, -0.02), (0, -0.047506277))
            Line((0, -0.047506277), (0, -3e-08))
        make_face()
    revolve(axis=Axis((-17.755750318, 8.297400445, 7), (0, 0, -1)), revolution_arc=116.299877018, mode=Mode.SUBTRACT)
    with BuildSketch(Plane(origin=(-11.587108195, 3.815619603, 7), x_dir=(-0.5931978896331799, 0.8050566835538613, 0), z_dir=(0.8050566835538613, 0.5931978896331799, 0))) as chamfer_11_piece_18:
        with BuildLine():
            Line((0, 3e-08), (1.028284298, -1.028284271))
            Line((1.028284298, -1.028284271), (1.048284298, -1.028284271))
            ThreePointArc((1.048284298, -1.028284271), (1.020000027, -0.514142136), (1.02000003, 0))
            Line((1.02000003, 0), (1.00000003, 0.02))
            Line((1.00000003, 0.02), (0, 0.047506277))
            Line((0, 0.047506277), (0, 3e-08))
        make_face()
    revolve(axis=Axis((-11.587108195, 3.815619603, 7), (0, 0, 1)), revolution_arc=116.299877018, mode=Mode.SUBTRACT)
    with BuildSketch(Plane(origin=(33.571682988, 52.5, 7), x_dir=(0, -1, 0), z_dir=(-1, 0, 0))) as chamfer_11_piece_19:
        with BuildLine():
            Line((1.028284271, 0.028284271), (-0.028284271, -1.028284271))
            Line((-0.028284271, -1.028284271), (-0.048284271, -1.028284271))
            ThreePointArc((-0.048284271, -1.028284271), (-0.02, -0.514142136), (-0.02, 0))
            Line((-0.02, 0), (0, 0.02))
            ThreePointArc((0, 0.02), (0.514142136, 0.02), (1.028284271, 0.048284271))
            Line((1.028284271, 0.048284271), (1.028284271, 0.028284271))
        make_face()
    extrude(amount=33.571682988, mode=Mode.SUBTRACT)

    # 草图24 → 切除-拉伸3 (cut)
    with BuildSketch(Plane.ZY):
        with Locations((-3, 26.25)):
            Rectangle(SKETCH_24_W, SKETCH_24_H)
    extrude(amount=-CUT_EXTRUDE_3_DEPTH, mode=Mode.SUBTRACT)

    # 倒角12
    chamfer_12_edges = [part.edges().sort_by_distance(p)[0] for p in [
        (10, 2.331386559, 0),
        (10, 2.331386559, -6),
        (0, 2.75, -6),
        (0, 50.25, -6),
        (10, 50.151225979, -6),
        (10, 50.151225979, 0),
    ]]
    chamfer(chamfer_12_edges, length=CHAMFER_12_SIZE)

    # 草图6 → 切除-拉伸4 (cut, through all)
    with BuildSketch(Plane(origin=(34, 0, 0), x_dir=(0, 0, -1), z_dir=(1, 0, 0))):
        with Locations((27, 26.25)):
            Circle(SKETCH_6_R)
        with Locations((9, 15.857695155)):
            Circle(SKETCH_6_R)
        with Locations((9, 36.642304845)):
            Circle(SKETCH_6_R)
    extrude(amount=-CUT_EXTRUDE_4_DEPTH, mode=Mode.SUBTRACT)

    # 草图25 → 切除-拉伸5 (cut)
    with BuildSketch(Plane(origin=(34, 0, 0), x_dir=(0, 0, -1), z_dir=(1, 0, 0))):
        with Locations((15, 26.25)):
            Circle(SKETCH_25_R)
    extrude(amount=-CUT_EXTRUDE_5_DEPTH, mode=Mode.SUBTRACT)


solid = part.part
